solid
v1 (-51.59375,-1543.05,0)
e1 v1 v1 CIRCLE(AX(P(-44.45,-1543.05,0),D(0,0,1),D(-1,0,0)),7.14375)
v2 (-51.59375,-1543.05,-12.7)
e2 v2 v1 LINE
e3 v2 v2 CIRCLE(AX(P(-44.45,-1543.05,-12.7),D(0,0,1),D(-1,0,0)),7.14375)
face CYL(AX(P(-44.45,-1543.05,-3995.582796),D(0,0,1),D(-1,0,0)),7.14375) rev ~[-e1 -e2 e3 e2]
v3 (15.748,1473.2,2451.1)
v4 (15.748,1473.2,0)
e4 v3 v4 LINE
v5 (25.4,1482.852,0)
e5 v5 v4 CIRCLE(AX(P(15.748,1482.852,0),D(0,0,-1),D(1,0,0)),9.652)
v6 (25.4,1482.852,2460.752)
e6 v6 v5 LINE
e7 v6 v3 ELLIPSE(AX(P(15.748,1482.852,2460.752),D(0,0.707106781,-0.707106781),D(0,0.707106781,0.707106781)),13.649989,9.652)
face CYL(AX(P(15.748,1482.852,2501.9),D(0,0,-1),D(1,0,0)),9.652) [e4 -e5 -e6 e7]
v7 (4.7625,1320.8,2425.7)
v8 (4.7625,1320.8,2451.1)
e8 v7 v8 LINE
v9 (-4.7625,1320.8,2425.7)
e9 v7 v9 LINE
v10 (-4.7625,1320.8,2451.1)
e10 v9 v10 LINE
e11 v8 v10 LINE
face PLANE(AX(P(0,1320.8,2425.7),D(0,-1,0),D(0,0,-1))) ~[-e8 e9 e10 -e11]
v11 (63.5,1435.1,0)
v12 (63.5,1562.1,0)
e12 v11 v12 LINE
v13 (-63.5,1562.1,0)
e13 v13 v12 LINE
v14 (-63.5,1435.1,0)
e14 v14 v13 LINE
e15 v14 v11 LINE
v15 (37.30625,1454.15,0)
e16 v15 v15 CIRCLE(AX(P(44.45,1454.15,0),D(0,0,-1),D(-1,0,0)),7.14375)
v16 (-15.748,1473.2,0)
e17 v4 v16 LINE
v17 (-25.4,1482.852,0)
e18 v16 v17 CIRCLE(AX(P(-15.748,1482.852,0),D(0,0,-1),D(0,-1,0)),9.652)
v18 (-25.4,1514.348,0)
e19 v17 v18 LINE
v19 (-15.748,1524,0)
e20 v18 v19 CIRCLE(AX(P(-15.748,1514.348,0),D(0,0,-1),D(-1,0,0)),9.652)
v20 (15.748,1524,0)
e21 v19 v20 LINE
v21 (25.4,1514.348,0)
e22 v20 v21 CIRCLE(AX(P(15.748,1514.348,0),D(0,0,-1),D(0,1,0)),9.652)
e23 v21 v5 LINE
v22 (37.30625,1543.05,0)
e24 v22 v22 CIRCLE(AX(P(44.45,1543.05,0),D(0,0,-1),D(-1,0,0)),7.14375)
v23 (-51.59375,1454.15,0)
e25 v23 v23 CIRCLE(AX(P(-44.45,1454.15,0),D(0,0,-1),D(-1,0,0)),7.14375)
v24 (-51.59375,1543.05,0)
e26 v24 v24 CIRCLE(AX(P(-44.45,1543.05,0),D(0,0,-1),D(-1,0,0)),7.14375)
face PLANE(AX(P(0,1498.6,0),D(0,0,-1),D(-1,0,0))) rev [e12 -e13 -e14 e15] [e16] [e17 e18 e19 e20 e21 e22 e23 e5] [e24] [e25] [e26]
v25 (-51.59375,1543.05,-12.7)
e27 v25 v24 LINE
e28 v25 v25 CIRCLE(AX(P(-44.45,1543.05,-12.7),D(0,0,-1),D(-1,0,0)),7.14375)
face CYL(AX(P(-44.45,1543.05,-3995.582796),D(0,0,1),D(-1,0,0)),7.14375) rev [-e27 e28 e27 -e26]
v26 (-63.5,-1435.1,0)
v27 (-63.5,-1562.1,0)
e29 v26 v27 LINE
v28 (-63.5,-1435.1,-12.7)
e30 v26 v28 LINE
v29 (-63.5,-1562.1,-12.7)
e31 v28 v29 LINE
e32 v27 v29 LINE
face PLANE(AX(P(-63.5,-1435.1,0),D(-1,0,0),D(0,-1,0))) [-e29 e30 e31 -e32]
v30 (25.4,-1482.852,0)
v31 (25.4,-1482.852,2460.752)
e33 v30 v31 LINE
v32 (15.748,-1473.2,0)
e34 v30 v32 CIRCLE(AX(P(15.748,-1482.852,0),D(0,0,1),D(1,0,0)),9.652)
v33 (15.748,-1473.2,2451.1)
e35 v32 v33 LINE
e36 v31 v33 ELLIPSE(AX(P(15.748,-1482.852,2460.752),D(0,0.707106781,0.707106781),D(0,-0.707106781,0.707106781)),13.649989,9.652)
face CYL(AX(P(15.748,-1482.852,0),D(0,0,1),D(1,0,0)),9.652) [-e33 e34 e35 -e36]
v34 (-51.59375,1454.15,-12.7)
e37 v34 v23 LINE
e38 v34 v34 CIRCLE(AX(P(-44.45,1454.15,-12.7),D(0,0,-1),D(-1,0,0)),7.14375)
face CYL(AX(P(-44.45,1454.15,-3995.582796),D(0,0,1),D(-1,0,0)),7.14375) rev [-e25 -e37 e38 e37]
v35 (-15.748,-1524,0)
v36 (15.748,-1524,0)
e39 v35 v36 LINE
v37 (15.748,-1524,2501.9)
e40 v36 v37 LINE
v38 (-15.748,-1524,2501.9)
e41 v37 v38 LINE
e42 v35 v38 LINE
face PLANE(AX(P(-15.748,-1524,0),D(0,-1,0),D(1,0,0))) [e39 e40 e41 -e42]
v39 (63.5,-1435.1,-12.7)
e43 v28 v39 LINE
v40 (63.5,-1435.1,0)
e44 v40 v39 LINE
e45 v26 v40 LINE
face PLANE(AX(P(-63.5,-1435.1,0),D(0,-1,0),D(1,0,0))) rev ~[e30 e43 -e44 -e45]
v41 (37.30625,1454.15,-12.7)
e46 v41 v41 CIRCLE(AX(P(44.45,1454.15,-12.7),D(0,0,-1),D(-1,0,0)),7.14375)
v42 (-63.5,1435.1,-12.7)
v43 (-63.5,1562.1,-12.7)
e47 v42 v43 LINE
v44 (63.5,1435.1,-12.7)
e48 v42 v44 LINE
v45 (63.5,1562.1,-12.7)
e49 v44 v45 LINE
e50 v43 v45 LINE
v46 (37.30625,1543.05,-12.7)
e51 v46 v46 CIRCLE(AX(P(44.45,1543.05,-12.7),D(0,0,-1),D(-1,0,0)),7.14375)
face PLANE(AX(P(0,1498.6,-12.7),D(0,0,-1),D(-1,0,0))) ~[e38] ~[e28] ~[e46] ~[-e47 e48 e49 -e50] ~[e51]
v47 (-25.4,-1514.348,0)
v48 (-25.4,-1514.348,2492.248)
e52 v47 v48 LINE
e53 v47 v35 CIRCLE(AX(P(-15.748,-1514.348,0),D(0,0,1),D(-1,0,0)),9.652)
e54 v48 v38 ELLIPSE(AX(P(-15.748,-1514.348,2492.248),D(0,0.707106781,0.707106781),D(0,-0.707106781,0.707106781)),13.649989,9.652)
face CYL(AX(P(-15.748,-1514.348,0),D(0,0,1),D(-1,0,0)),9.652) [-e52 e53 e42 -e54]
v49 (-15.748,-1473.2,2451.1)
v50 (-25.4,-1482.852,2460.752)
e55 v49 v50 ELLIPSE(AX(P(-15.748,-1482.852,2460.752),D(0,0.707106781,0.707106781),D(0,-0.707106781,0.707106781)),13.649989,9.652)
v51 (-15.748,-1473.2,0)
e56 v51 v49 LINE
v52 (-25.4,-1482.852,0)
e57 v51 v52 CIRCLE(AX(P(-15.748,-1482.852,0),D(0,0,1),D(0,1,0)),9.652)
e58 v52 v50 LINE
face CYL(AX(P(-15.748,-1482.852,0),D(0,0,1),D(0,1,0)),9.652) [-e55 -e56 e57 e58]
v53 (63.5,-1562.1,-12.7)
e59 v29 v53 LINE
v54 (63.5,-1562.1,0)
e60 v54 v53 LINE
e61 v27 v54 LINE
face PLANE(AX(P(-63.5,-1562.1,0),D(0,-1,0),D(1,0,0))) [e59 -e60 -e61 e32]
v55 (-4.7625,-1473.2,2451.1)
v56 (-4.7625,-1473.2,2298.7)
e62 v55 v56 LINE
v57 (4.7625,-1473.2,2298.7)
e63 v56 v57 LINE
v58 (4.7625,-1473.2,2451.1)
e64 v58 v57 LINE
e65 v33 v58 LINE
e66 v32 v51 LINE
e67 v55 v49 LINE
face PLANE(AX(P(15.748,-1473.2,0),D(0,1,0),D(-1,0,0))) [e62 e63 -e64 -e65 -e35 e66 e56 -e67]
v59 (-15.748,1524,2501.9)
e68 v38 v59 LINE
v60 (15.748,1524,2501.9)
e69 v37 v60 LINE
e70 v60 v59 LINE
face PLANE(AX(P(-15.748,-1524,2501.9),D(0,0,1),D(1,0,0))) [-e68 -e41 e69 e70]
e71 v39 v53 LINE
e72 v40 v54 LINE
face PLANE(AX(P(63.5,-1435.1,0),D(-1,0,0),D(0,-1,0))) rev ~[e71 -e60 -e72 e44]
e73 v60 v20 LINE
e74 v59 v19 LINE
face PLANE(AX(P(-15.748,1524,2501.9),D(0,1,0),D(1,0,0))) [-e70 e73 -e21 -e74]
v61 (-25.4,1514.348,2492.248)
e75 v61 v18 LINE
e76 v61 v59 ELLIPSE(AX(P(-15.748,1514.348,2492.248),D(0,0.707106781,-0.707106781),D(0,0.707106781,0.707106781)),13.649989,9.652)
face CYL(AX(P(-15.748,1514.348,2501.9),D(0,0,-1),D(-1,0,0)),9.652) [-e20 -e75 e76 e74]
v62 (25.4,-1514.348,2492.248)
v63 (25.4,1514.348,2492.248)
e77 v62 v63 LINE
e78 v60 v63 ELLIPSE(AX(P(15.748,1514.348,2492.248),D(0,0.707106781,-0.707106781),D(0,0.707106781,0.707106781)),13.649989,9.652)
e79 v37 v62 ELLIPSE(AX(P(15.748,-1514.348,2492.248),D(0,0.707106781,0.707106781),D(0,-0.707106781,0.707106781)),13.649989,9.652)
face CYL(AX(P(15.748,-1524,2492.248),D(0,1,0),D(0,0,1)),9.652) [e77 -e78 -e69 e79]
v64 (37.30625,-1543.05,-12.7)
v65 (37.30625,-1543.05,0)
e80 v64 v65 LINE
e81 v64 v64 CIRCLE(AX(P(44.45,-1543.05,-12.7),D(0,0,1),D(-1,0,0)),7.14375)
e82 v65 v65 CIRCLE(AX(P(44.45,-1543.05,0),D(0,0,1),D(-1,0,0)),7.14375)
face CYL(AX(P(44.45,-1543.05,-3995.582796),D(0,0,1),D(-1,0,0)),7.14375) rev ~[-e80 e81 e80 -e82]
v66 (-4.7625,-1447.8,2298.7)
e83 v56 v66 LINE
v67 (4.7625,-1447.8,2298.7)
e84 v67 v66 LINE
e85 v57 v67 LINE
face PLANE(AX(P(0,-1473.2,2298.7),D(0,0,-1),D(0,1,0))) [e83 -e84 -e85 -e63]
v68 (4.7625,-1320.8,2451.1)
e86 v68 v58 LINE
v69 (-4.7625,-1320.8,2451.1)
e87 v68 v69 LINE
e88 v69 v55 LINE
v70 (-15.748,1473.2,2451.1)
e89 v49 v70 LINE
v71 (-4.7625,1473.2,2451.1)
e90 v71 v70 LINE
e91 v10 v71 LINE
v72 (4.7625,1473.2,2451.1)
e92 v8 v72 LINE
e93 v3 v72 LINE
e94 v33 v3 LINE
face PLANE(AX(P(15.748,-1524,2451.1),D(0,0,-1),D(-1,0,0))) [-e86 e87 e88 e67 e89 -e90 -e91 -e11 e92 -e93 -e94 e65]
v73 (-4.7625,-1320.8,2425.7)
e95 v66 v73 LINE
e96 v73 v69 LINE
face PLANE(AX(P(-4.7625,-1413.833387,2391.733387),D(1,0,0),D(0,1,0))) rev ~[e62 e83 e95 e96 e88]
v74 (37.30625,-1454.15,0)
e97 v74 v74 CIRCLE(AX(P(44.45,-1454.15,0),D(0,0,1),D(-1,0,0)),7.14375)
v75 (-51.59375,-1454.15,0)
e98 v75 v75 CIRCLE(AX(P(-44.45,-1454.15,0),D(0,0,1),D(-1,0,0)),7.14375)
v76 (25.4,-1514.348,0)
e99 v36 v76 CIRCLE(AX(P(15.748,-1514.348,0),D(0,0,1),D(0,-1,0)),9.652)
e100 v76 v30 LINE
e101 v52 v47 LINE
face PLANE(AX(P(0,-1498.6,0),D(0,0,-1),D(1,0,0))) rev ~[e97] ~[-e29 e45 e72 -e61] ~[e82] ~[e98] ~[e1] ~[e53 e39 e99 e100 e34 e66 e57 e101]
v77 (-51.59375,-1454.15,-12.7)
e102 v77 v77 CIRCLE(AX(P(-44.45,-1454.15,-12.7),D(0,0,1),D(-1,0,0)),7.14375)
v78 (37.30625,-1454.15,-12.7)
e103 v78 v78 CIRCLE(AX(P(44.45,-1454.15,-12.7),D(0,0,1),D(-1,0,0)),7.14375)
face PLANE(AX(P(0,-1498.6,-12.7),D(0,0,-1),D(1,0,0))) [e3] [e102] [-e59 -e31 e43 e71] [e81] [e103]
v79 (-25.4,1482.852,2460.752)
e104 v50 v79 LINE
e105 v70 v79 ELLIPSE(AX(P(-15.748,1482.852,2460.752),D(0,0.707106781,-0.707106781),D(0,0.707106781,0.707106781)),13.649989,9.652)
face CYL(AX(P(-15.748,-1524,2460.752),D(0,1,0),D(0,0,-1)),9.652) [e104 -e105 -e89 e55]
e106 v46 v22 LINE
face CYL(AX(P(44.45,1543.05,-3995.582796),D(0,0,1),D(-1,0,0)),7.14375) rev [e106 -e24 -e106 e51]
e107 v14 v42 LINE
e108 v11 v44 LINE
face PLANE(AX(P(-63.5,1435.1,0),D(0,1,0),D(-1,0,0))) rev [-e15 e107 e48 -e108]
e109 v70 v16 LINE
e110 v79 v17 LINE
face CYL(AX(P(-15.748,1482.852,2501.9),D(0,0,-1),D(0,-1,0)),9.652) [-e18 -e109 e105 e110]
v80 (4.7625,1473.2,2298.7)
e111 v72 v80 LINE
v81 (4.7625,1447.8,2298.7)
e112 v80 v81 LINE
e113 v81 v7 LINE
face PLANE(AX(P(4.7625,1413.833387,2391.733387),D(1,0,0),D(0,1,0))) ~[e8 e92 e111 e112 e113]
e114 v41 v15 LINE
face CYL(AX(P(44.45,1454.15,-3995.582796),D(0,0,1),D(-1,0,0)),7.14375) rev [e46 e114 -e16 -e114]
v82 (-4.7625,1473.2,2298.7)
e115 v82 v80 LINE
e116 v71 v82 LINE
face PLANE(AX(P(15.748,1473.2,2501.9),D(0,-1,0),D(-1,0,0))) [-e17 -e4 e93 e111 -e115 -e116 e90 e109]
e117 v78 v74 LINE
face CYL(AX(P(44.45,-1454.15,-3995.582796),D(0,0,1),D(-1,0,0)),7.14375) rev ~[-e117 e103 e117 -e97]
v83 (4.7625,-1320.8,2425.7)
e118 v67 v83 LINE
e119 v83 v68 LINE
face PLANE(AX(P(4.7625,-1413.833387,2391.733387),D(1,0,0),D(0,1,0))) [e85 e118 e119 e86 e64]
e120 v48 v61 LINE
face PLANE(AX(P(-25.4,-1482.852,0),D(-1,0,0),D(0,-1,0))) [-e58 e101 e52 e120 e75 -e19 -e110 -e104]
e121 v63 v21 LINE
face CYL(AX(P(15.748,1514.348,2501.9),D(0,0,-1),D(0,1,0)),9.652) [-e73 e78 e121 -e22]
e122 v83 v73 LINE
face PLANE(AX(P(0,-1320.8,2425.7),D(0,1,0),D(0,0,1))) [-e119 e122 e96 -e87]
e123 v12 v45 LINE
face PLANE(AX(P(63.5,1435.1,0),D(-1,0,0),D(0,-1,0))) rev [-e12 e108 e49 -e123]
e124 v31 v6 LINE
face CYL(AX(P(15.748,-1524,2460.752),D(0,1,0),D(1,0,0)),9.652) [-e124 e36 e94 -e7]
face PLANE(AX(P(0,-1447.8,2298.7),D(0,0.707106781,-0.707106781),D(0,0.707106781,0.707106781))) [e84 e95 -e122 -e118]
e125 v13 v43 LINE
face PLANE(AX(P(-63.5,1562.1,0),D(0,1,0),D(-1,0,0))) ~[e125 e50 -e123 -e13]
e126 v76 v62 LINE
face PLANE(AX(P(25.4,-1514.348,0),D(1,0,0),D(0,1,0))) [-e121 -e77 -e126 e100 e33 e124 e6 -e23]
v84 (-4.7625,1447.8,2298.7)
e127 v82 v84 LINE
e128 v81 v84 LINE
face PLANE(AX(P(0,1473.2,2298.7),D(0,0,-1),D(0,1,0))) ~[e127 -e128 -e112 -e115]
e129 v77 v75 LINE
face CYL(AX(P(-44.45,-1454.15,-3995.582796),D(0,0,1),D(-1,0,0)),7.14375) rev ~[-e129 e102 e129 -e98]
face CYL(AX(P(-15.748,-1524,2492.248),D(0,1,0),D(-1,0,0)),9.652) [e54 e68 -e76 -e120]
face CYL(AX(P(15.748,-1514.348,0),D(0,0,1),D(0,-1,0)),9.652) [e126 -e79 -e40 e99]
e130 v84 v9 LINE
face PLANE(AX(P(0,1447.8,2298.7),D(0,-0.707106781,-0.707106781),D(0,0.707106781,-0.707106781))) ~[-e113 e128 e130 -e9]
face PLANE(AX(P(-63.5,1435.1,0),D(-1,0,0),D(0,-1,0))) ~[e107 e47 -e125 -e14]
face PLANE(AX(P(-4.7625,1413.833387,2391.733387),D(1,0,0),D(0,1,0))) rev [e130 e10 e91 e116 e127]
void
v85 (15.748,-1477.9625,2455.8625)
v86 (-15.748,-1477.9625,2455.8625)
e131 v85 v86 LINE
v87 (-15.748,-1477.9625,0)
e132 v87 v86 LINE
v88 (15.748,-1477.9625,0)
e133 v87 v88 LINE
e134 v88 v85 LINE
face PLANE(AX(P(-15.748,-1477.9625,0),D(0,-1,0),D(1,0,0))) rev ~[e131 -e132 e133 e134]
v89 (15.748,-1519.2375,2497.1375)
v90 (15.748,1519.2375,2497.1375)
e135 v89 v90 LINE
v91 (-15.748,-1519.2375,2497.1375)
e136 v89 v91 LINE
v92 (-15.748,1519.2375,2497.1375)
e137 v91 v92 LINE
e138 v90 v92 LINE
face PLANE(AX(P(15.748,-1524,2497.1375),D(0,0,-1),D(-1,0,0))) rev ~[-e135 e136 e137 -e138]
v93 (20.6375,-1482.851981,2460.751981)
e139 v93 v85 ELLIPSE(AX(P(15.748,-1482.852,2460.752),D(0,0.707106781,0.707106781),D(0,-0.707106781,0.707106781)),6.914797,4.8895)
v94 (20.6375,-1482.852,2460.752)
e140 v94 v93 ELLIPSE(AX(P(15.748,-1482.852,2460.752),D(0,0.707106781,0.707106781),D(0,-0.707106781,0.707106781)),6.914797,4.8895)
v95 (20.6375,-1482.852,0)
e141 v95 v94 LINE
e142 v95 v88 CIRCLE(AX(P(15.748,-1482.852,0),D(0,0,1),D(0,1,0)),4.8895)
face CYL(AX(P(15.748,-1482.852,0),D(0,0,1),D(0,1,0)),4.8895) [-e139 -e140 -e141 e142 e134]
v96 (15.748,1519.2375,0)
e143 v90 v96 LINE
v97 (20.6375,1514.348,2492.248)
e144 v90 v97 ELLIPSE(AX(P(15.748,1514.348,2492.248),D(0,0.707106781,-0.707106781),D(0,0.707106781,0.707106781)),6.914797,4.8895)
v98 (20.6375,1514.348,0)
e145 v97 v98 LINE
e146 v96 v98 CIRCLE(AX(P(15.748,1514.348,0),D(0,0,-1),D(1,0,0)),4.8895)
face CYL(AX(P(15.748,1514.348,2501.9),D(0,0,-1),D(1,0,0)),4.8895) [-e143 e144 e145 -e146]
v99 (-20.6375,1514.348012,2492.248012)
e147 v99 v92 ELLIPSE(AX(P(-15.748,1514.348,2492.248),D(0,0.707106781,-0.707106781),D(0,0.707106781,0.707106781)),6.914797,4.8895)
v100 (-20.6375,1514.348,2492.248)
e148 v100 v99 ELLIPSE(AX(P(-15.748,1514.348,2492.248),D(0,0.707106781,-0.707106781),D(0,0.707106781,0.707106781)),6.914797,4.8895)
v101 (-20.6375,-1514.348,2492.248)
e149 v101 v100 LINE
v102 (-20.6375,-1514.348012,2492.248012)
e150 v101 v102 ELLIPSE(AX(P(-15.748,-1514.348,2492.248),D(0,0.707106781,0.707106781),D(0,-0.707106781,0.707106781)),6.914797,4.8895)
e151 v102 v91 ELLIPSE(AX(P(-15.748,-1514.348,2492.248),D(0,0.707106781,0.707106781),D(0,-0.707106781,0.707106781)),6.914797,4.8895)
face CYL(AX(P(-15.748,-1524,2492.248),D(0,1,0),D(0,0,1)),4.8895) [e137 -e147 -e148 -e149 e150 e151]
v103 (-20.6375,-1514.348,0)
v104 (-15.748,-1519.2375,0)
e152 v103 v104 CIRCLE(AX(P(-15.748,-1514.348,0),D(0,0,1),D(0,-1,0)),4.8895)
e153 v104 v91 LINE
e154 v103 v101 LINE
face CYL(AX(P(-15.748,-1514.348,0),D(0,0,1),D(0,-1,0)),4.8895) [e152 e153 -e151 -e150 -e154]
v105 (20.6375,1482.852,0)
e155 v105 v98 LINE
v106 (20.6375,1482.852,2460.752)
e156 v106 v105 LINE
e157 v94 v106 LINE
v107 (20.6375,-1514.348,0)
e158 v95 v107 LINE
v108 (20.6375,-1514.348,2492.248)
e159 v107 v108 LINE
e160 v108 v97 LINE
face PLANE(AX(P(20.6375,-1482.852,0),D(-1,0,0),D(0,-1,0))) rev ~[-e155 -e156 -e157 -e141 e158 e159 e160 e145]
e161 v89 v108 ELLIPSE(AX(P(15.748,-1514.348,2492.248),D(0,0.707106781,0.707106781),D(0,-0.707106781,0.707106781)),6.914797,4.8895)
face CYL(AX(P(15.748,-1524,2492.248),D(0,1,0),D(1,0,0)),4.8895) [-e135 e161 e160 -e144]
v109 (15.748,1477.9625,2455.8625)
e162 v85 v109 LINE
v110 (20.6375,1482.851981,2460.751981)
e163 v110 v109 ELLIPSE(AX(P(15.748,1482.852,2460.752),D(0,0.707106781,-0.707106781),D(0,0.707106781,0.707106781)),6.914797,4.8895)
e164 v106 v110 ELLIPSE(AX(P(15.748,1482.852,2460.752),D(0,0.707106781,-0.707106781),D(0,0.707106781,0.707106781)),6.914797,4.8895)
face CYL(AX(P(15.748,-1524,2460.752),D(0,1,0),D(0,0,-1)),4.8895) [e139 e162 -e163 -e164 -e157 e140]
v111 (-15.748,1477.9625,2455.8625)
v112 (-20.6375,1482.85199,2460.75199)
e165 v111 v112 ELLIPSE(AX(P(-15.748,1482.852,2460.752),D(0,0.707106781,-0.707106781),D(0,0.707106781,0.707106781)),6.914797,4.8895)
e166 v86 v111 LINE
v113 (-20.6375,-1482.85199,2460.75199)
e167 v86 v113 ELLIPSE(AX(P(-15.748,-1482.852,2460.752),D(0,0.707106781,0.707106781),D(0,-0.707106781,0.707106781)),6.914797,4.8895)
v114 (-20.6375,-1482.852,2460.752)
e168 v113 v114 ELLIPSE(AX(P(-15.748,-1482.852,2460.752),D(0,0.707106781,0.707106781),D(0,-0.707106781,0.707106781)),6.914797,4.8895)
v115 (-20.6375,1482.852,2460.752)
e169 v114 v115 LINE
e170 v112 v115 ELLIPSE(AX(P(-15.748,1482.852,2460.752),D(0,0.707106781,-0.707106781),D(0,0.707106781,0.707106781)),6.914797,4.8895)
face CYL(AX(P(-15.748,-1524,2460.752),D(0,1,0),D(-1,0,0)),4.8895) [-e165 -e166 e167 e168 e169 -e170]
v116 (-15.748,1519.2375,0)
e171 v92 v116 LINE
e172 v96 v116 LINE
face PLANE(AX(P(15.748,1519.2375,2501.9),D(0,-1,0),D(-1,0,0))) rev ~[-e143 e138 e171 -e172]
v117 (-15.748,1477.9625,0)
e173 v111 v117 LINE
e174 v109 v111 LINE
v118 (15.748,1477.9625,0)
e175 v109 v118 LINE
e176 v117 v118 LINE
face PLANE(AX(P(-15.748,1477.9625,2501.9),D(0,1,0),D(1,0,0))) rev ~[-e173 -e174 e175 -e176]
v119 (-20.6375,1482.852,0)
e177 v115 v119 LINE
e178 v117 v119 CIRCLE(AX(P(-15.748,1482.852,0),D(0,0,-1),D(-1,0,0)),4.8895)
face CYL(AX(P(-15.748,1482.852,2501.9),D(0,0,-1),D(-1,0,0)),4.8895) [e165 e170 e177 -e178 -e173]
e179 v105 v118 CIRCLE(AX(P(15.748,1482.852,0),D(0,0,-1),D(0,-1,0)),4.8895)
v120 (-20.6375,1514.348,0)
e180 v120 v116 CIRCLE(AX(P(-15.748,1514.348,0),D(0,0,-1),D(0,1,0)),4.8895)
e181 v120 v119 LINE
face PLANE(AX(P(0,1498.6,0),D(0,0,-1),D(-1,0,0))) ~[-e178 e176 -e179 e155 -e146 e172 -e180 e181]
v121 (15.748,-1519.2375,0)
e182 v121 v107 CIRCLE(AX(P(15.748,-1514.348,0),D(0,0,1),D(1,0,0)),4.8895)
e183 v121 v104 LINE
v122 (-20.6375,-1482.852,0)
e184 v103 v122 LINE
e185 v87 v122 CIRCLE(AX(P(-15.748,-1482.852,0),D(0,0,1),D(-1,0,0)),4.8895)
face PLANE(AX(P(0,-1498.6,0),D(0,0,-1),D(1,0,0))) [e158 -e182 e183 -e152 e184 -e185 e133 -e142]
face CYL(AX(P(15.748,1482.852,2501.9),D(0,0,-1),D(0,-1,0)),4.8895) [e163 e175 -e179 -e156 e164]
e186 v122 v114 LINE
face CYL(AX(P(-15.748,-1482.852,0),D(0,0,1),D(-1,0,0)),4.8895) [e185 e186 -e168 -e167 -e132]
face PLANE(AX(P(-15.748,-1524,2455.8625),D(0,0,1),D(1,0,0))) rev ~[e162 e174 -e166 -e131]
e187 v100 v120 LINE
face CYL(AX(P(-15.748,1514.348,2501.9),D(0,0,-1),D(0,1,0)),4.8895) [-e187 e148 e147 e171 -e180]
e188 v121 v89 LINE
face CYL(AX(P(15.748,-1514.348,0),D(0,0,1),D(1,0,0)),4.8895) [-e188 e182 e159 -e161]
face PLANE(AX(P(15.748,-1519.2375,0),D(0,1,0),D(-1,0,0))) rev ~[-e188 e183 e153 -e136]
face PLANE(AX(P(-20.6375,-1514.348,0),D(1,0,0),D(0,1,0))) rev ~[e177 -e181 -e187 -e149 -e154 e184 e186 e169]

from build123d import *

# Parameters (mm, degrees)
F3_W      = 127
F3_H      = 127
F4_DEPTH  = 12.7
F6_D      = 14.2875
F10_DEPTH = 4.7625


# Not quite as in the source:
# - a length typed as a fraction of an inch, garbled in the dataset ("3 / 203.2 mm" for 3/8 in), is restored
# - a feature names something its author has since deleted; it is built from what else it names


with BuildPart() as f2:
    # F2: sweep along a path in F0
    with BuildLine(Plane.YZ) as f2_path:
        Line((-1524, 0), (-1524, 2501.9))
        Line((-1524, 2501.9), (1524, 2501.9))
        Line((1524, 2501.9), (1524, 0))
    # F1 (on Top) → F2 (sweep)
    with BuildSketch(Plane.XY):
        with BuildLine():
            Line((-15.748, -1524), (0, -1524))
            Line((0, -1524), (15.748, -1524))
            ThreePointArc((15.748, -1524), (22.572994652, -1521.172994652), (25.4, -1514.348))
            Line((25.4, -1514.348), (25.4, -1482.852))
            ThreePointArc((25.4, -1482.852), (22.572994652, -1476.027005348), (15.748, -1473.2))
            Line((15.748, -1473.2), (-15.748, -1473.2))
            ThreePointArc((-15.748, -1473.2), (-22.572994652, -1476.027005348), (-25.4, -1482.852))
            Line((-25.4, -1482.852), (-25.4, -1514.348))
            ThreePointArc((-25.4, -1514.348), (-22.572994652, -1521.172994652), (-15.748, -1524))
        make_face()
        with BuildLine():
            Line((0, -1519.2375), (-15.748, -1519.2375))
            ThreePointArc((-15.748, -1519.2375), (-19.2053986066, -1517.8053986066), (-20.6375, -1514.348))
            Line((-20.6375, -1514.348), (-20.6375, -1482.852))
            ThreePointArc((-20.6375, -1482.852), (-19.2053986066, -1479.3946013934), (-15.748, -1477.9625))
            Line((-15.748, -1477.9625), (15.748, -1477.9625))
            ThreePointArc((15.748, -1477.9625), (19.2053986066, -1479.3946013934), (20.6375, -1482.852))
            Line((20.6375, -1482.852), (20.6375, -1514.348))
            ThreePointArc((20.6375, -1514.348), (19.2053986066, -1517.8053986066), (15.748, -1519.2375))
            Line((15.748, -1519.2375), (0, -1519.2375))
        make_face(mode=Mode.SUBTRACT)
    sweep(path=f2_path.line, transition=Transition.RIGHT)

    # F3 (on face) → F4 (join)
    with BuildSketch(Plane(origin=(0, 0, 0), x_dir=(1, 0, 0), z_dir=(0, 0, -1))):
        with Locations((0, 1498.6)):
            Rectangle(F3_W, F3_H)
    extrude(amount=F4_DEPTH)

    # F6 (through all)
    with Locations(Plane(origin=(0, 0, -12.7), x_dir=(1, 0, 0), z_dir=(0, 0, -1))):
        with Locations((-44.45, 1454.15), (-44.45, 1543.05), (44.45, 1543.05), (44.45, 1454.15)):
            Hole(F6_D / 2)


with BuildPart() as f7_1:
    # F7: instance of F2
    add(f2.part.mirror(Plane.XZ))


with BuildPart() as f2_1:
    add(f2.part)

    add(f7_1.part)  # F10 merges F7_1
    # F9 (on mid) → F10 (join, symmetric)
    with BuildSketch(Plane.YZ):
        Polygon((-1320.8, 2451.1), (-1473.2, 2451.1), (-1473.2, 2298.7), (-1447.8, 2298.7), (-1320.8, 2425.7), align=None)
    extrude(amount=F10_DEPTH, both=True)

    # F11: F2 across plane


with BuildPart() as f2_2:
    add(f2_1.part)
    add(f2_1.part.mirror(Plane.XZ))


solid = f2_2.part
